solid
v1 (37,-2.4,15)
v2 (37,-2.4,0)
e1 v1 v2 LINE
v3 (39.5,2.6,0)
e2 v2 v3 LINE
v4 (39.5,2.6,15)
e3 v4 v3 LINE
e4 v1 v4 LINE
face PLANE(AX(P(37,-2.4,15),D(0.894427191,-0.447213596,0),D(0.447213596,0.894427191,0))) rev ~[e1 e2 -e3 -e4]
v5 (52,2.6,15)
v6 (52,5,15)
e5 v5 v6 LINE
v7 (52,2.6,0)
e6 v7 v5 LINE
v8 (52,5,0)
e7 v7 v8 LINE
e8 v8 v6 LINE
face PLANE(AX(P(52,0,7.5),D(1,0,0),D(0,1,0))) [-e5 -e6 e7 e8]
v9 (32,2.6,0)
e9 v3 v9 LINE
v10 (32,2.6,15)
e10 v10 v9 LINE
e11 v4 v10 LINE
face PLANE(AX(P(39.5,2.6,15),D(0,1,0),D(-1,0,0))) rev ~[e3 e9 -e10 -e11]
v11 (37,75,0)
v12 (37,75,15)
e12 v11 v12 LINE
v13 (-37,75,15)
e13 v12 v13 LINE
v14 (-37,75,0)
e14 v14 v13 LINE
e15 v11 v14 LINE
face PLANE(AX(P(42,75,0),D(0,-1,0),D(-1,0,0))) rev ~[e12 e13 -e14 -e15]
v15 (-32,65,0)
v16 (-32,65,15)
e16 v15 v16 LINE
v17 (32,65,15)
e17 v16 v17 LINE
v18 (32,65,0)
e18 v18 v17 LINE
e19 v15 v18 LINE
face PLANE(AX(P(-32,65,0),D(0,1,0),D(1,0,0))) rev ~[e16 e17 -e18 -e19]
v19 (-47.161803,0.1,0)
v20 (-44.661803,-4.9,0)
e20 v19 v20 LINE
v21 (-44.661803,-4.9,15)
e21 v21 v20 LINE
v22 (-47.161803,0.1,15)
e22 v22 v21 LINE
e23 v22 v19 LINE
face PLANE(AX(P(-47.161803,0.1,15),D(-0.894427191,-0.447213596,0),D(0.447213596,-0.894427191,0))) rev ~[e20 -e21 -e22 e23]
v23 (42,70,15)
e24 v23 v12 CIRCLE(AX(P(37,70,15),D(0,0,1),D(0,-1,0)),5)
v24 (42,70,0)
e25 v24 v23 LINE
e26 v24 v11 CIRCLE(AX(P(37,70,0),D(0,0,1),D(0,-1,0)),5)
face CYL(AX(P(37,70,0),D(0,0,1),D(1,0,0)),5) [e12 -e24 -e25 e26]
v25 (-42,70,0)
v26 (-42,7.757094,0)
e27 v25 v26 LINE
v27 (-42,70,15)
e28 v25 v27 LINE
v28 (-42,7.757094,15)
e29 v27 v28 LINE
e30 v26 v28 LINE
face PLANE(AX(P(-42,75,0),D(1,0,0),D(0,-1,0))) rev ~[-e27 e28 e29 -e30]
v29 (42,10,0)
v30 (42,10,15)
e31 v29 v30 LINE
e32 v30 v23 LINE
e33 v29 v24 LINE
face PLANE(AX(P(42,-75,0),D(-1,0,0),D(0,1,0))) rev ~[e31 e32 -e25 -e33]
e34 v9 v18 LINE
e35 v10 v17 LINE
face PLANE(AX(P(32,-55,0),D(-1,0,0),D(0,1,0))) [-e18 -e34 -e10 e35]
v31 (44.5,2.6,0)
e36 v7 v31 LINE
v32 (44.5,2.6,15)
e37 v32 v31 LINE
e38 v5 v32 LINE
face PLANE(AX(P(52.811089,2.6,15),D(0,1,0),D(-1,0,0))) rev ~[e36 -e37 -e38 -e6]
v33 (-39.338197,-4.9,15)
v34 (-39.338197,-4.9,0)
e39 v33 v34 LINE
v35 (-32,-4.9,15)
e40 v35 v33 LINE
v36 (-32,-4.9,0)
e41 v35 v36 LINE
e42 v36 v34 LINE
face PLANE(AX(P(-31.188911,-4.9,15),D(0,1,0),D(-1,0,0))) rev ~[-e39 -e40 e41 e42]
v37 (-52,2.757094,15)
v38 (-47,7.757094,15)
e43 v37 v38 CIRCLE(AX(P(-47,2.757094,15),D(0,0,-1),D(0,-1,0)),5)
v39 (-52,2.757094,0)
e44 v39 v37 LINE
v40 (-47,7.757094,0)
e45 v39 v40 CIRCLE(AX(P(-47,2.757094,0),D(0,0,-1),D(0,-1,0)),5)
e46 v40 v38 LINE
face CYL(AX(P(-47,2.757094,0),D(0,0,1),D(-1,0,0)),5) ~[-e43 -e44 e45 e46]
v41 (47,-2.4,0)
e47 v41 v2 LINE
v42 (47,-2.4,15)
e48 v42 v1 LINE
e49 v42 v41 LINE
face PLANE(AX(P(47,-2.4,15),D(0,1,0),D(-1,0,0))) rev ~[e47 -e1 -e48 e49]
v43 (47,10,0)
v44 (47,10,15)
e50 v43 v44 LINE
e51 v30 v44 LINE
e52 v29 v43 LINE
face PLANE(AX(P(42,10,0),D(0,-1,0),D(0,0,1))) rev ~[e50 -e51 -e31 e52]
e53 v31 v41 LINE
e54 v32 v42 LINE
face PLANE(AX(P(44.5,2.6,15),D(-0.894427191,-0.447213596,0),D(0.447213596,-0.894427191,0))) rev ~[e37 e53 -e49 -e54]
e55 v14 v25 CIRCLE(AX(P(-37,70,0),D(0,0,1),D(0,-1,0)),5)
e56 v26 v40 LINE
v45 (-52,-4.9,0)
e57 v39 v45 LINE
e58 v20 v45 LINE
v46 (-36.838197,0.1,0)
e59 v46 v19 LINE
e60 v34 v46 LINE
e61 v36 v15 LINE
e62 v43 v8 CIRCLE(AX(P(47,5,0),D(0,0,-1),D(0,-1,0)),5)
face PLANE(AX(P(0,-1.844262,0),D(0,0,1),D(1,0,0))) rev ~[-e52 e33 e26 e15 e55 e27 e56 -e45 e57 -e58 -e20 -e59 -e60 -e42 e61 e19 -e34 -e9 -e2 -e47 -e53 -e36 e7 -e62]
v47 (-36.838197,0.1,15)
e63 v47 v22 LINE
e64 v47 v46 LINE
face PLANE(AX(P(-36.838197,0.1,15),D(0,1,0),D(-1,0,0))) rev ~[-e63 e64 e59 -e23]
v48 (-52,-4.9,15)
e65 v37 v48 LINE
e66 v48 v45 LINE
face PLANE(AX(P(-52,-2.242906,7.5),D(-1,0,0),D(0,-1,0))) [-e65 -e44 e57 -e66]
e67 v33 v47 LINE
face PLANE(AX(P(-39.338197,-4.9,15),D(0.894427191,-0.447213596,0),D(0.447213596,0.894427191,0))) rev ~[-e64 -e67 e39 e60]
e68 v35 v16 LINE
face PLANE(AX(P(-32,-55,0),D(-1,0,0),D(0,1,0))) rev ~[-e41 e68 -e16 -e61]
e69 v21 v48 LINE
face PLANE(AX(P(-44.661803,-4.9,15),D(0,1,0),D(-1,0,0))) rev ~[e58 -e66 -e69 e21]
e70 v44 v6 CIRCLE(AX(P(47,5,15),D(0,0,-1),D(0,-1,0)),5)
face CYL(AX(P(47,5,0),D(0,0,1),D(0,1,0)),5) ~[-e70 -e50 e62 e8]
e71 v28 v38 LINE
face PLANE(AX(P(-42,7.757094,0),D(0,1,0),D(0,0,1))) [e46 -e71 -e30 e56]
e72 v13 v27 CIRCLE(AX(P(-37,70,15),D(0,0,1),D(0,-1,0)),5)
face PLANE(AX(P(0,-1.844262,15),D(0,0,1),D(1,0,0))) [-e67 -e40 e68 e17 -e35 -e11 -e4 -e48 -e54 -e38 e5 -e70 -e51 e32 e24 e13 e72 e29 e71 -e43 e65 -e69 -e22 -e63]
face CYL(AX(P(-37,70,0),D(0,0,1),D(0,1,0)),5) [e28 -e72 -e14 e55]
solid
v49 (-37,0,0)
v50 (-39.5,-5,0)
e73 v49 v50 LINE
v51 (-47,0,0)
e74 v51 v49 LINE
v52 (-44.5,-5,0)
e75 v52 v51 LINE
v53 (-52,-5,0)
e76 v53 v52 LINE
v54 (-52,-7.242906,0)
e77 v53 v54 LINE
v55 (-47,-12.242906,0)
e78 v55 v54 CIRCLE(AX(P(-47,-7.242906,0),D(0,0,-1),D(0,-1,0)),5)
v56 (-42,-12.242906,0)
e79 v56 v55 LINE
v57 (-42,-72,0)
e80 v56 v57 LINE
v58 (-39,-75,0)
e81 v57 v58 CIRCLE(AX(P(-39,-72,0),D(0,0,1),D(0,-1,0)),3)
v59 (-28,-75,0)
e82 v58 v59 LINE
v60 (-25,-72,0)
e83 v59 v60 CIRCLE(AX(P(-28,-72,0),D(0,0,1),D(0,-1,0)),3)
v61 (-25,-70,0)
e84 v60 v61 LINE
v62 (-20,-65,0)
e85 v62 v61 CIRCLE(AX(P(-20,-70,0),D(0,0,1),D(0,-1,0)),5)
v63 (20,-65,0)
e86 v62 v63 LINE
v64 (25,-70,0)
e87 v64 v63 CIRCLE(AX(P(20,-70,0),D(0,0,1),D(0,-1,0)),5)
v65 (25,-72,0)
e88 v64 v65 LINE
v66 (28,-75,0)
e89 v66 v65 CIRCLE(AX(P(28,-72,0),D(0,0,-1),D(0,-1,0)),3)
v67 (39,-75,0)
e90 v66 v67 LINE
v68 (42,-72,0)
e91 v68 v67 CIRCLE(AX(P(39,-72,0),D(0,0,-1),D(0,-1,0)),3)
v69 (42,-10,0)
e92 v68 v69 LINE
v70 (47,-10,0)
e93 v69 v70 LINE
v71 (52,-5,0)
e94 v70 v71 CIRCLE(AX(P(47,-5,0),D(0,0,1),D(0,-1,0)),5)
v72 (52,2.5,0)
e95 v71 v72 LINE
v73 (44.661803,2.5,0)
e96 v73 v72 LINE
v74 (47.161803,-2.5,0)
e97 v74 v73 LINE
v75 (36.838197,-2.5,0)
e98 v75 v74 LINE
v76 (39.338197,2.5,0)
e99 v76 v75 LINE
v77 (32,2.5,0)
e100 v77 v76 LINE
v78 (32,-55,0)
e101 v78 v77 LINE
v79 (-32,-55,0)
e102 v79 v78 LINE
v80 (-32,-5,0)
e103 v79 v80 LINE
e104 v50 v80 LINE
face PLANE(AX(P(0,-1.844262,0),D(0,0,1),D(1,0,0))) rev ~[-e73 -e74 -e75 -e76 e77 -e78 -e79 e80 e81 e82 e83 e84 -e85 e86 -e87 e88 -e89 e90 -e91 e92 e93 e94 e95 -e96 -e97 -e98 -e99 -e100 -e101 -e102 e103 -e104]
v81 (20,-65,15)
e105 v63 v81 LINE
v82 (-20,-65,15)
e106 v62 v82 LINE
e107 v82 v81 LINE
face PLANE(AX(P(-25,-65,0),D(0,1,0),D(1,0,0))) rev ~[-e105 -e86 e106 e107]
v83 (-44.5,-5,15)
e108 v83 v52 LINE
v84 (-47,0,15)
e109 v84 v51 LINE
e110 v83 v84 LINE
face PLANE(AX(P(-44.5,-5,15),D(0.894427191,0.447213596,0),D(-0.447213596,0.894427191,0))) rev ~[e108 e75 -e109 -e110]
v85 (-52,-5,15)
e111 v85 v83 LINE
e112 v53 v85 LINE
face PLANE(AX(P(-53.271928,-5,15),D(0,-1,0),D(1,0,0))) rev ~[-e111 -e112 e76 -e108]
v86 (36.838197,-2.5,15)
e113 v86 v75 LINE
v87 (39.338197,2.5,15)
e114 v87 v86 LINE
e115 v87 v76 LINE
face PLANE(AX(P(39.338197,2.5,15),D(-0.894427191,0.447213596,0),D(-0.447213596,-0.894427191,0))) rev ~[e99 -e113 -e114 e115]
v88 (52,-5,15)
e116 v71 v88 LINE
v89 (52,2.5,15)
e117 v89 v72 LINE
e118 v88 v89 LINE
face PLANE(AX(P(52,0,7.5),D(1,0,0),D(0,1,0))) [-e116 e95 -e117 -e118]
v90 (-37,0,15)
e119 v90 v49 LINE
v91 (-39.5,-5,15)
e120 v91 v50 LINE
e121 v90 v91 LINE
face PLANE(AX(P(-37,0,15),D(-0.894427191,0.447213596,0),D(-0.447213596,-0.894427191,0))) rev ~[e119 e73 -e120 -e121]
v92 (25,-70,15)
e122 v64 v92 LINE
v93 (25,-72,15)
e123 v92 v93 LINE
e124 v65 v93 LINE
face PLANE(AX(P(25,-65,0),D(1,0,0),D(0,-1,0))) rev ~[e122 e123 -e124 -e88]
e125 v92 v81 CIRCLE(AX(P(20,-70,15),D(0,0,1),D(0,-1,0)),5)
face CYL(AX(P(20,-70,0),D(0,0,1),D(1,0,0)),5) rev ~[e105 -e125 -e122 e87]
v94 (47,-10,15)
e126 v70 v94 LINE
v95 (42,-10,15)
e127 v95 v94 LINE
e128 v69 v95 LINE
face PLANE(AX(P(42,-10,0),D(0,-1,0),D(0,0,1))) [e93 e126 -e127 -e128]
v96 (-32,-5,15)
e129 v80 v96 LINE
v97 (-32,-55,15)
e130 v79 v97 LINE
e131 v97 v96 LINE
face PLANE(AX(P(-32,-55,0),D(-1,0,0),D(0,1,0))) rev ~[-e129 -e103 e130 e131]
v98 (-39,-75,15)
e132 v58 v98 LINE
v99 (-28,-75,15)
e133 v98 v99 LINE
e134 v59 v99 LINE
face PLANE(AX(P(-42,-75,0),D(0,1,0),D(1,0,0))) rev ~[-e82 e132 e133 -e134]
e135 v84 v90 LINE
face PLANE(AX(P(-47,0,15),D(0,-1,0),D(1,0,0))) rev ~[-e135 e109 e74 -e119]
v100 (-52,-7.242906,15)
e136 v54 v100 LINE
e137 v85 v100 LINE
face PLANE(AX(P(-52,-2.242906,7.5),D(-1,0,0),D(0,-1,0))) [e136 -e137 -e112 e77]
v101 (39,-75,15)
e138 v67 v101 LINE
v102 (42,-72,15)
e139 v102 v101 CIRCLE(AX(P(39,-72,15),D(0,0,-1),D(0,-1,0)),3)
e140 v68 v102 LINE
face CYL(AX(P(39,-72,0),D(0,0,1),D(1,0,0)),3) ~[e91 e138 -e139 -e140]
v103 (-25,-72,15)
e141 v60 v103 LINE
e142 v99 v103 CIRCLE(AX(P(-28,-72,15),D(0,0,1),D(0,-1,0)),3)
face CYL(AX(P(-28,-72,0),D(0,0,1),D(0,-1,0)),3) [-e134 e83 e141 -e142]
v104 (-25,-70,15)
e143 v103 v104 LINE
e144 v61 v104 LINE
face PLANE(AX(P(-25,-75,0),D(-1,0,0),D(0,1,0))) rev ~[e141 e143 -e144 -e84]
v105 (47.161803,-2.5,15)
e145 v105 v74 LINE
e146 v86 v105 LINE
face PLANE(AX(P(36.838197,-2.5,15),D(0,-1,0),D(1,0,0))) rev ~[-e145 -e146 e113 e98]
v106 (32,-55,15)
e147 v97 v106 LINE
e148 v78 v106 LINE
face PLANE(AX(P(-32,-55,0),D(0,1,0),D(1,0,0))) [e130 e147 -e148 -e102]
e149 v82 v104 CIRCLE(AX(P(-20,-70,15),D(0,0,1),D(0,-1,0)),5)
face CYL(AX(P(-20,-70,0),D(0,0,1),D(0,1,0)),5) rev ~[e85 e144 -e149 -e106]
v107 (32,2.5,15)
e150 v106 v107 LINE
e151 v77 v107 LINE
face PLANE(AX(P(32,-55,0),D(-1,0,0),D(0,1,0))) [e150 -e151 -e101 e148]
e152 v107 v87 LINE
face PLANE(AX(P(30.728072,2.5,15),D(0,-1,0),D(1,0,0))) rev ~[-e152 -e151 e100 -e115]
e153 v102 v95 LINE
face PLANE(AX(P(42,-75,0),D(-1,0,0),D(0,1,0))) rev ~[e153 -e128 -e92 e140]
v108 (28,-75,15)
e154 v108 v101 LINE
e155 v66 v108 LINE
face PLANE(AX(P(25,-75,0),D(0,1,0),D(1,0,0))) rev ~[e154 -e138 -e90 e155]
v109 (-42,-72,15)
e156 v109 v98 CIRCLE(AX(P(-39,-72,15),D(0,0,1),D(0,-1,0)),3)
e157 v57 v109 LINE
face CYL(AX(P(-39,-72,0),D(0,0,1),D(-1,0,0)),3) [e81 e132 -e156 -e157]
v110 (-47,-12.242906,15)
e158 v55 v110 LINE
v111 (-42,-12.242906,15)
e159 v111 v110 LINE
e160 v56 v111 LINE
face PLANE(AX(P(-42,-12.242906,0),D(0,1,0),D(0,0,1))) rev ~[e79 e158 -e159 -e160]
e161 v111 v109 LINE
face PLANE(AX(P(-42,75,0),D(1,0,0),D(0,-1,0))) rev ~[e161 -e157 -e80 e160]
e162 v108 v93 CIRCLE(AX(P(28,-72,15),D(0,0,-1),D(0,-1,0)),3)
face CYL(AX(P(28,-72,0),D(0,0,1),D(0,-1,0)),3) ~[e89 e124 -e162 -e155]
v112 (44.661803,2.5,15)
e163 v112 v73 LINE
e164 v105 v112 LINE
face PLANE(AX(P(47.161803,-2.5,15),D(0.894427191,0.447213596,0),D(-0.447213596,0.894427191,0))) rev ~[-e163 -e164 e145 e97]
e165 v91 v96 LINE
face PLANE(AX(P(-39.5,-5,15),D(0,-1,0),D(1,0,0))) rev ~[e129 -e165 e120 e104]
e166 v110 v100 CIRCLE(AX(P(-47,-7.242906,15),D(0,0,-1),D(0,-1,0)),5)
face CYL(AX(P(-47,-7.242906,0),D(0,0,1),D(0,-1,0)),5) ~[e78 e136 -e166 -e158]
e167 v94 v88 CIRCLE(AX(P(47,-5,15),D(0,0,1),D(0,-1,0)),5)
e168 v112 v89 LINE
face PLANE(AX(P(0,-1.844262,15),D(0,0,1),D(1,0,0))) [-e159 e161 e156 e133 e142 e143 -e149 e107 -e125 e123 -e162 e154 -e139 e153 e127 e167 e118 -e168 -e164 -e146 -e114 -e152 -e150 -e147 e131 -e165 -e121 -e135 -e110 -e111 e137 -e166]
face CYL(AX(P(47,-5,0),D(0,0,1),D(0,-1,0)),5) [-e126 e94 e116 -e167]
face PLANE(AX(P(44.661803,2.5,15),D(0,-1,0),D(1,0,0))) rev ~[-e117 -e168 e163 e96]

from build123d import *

# Parameters (mm, degrees)
F0_W          = 64
F0_H          = 120
F1_DEPTH      = 15
F2_R          = 3
F3_R          = 5
F4_W          = 20
F4_H          = 15
F5_DEPTH      = 10
F6_W          = 20
F6_H          = 15
F7_DEPTH      = 10
F9_DEPTH      = 15.001
F9_DEPTH_BACK = 191
F10_R         = 5


# Not quite as in the source:
# - an extrude ends at something that could not be found from the text; its depth is read off the source's solid


with BuildPart() as f1:
    # F0 (on Top) → F1 (new body)
    with BuildSketch(Plane.XY):
        Polygon((42, -75), (42, 75), (-42, 75), (-42, -75), (-25, -75), (-25, -65), (25, -65), (25, -75), align=None)
        with Locations((0, 5)):
            Rectangle(F0_W, F0_H, mode=Mode.SUBTRACT)
    extrude(amount=F1_DEPTH)

    # F2
    f2_edges = [f1.edges().sort_by_distance(p)[0] for p in [
        (25, -75, 7.5),
        (42, -75, 7.5),
        (-25, -75, 7.5),
        (-42, -75, 7.5),
    ]]
    fillet(f2_edges, radius=F2_R)

    # F3
    f3_edges = [f1.edges().sort_by_distance(p)[0] for p in [
        (-25, -65, 7.5),
        (25, -65, 7.5),
        (-42, 75, 7.5),
        (42, 75, 7.5),
    ]]
    fillet(f3_edges, radius=F3_R)

    # F4 (on face) → F5 (join)
    with BuildSketch(Plane(origin=(-42, 0, 0), x_dir=(0, -1, 0), z_dir=(-1, 0, 0))):
        with Locations((2.2429061755, 7.5)):
            Rectangle(F4_W, F4_H)
    extrude(amount=F5_DEPTH)

    # F6 (on face) → F7 (join)
    with BuildSketch(Plane.YZ.offset(42)):
        with Locations((0, 7.5)):
            Rectangle(F6_W, F6_H)
    extrude(amount=F7_DEPTH)

    # F8 (on face) → F9 (cut, two sides)
    with BuildSketch(Plane.XY.offset(15)) as f9_sk:
        Polygon((-44.5, -5), (-47, 0), (-37, 0), (-39.5, -5), (-31.7807010276, -5), (-31.188910827, -5), (-31.188910827, -4.9), (-39.3381966011, -4.9), (-36.8381966011, 0.1), (-47.1618033989, 0.1), (-44.6618033989, -4.9), (-53.2719284122, -4.9), (-53.2719284122, -5), align=None)
        Polygon((44.6618033989, 2.5), (52.811089173, 2.5), (52.811089173, 2.6), (44.5, 2.6), (47, -2.4), (37, -2.4), (39.5, 2.6), (30.7280715878, 2.6), (30.7280715878, 2.5), (39.3381966011, 2.5), (36.8381966011, -2.5), (47.1618033989, -2.5), align=None)
    extrude(amount=-F9_DEPTH, mode=Mode.SUBTRACT)
    extrude(f9_sk.sketch, amount=F9_DEPTH_BACK, mode=Mode.SUBTRACT)

    # F10
    f10_edges = [f1.edges().sort_by_distance(p)[0] for p in [
        (52, -10, 7.5),
        (52, 10, 7.5),
        (-52, 7.757094, 7.5),
        (-52, -12.242906, 7.5),
    ]]
    fillet(f10_edges, radius=F10_R)


solid = f1.part
